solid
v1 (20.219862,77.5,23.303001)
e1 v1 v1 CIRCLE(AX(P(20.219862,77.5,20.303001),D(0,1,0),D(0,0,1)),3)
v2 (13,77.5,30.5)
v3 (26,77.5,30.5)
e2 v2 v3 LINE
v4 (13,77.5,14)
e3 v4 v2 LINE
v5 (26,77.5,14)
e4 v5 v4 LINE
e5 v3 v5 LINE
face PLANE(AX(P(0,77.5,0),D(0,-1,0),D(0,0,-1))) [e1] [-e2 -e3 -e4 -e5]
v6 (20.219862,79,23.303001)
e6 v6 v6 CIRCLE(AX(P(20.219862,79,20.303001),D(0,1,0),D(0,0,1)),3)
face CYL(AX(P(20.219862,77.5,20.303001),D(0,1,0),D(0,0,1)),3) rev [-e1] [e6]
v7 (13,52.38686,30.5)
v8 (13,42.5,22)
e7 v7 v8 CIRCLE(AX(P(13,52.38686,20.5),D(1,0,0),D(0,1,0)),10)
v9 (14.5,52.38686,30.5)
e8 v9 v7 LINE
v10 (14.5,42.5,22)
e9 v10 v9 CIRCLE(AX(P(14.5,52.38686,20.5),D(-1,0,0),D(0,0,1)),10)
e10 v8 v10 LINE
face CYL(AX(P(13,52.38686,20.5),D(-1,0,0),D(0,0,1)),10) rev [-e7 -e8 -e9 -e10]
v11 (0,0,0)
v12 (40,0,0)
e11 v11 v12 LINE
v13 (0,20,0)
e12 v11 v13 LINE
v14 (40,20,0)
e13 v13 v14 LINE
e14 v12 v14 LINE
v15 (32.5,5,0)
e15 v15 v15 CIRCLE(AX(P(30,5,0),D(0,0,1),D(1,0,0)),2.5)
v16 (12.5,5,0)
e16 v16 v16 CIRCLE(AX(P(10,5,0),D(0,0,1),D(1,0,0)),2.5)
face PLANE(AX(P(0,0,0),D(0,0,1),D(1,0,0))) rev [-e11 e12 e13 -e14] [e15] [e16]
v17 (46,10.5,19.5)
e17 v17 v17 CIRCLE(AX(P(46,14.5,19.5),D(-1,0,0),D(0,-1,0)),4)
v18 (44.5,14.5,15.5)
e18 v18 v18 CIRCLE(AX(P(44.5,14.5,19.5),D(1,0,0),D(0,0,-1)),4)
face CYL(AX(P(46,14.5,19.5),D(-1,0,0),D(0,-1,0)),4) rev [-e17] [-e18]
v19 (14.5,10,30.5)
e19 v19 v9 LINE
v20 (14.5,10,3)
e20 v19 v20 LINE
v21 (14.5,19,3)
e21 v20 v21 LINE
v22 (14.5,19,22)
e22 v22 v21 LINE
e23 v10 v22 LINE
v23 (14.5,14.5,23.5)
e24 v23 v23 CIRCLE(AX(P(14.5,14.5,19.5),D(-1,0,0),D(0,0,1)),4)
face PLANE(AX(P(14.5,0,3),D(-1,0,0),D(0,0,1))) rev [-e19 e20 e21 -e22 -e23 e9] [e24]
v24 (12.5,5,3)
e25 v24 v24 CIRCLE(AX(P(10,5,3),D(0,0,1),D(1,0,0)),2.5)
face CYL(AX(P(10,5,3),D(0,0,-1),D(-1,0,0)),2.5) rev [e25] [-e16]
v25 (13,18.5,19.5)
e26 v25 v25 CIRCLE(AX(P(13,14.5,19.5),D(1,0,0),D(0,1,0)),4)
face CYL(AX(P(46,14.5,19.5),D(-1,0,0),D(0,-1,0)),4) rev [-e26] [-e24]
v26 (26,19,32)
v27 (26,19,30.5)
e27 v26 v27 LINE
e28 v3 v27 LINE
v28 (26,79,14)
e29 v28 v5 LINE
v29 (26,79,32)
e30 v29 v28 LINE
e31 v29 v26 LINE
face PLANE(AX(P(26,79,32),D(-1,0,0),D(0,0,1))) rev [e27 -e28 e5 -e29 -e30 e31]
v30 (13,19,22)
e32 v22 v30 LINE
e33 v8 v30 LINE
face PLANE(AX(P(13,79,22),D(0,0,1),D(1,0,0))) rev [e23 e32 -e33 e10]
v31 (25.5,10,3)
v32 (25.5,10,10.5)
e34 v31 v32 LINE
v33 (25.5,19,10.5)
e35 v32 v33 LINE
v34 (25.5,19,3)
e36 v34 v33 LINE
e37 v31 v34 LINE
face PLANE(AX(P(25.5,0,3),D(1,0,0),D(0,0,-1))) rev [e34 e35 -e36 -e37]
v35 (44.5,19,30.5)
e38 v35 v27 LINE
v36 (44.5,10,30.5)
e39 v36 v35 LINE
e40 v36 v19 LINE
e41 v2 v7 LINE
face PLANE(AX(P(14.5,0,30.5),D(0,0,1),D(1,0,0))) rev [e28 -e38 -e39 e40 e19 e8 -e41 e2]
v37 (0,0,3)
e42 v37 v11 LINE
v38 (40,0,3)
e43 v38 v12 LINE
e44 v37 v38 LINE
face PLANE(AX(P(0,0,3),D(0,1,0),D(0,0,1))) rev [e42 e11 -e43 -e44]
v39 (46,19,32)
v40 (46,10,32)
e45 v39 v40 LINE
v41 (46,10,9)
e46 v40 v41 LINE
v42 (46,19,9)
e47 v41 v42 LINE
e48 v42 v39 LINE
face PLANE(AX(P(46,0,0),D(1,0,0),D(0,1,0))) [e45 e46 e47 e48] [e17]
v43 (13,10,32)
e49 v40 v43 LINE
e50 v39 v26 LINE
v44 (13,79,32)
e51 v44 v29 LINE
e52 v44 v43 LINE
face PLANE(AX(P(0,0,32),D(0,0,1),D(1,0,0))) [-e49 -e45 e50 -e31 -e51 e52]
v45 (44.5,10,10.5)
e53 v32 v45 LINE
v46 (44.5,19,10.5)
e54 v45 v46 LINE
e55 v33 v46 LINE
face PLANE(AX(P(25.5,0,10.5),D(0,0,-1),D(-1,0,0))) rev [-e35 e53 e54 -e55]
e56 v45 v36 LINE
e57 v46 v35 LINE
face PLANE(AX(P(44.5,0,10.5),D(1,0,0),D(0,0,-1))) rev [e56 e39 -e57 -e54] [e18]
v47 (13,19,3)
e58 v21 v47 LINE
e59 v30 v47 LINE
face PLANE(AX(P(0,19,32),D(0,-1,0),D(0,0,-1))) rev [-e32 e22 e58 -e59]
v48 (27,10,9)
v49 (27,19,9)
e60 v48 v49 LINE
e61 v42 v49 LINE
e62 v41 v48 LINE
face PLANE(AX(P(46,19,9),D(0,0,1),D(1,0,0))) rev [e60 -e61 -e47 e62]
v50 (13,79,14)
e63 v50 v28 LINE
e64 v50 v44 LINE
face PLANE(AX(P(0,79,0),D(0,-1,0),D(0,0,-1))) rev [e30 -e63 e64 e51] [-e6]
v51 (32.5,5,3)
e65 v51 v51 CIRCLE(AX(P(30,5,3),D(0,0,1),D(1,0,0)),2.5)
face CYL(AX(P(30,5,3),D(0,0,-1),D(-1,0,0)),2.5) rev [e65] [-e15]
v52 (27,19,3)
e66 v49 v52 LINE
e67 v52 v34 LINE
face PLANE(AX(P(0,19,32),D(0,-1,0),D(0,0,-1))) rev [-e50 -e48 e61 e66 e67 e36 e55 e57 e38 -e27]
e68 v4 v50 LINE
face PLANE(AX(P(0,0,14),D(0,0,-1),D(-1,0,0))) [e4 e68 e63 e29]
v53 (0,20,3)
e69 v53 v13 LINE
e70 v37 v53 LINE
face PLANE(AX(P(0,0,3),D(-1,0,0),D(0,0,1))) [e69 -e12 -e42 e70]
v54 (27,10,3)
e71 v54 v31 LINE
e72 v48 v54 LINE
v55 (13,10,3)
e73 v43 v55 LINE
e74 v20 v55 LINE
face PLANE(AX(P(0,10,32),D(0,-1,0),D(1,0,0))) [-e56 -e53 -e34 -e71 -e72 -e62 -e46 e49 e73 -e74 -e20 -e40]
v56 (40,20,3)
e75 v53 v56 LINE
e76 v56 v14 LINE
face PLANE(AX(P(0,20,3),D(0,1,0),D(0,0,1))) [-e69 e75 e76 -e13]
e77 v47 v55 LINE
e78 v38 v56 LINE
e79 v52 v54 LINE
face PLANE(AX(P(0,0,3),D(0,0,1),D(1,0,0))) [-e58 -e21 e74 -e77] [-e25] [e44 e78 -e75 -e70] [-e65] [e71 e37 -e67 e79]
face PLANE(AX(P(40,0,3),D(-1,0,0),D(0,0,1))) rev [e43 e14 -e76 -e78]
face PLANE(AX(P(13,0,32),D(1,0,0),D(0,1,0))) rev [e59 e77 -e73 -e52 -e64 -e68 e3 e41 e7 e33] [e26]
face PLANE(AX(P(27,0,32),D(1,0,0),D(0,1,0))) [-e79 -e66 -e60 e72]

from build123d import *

# Parameters (mm, degrees)
SKETCH1_W               = 7
SKETCH1_H               = 9
BOSS_EXTRUDE2_DEPTH     = 32
SKETCH1_4_R             = 2.5
BOSS_EXTRUDE3_DEPTH     = 3
CUT_EXTRUDE1_DEPTH      = 55.635153519
CUT_EXTRUDE1_DEPTH_BACK = 55.635153519
SKETCH3_W               = 11
SKETCH3_H               = 27.5
SKETCH6_W               = 23
SKETCH6_H               = 9
BOSS_EXTRUDE4_DEPTH     = 19
CUT_EXTRUDE3_DEPTH      = 60.16924877
CUT_EXTRUDE3_DEPTH_BACK = 60.16924877
SKETCH9_W               = 19
SKETCH9_H               = 20
CUT_EXTRUDE4_DEPTH      = 51.129831438
CUT_EXTRUDE4_DEPTH_BACK = 51.129831438
SKETCH12_R              = 4
SKETCH14_W              = 13
SKETCH14_H              = 10
BOSS_EXTRUDE6_DEPTH     = 60
SKETCH17_W              = 11.5
SKETCH17_H              = 8.5
CUT_EXTRUDE6_DEPTH      = 58.5
SKETCH18_W              = 13
SKETCH18_H              = 1.5
BOSS_EXTRUDE7_DEPTH     = 8
SKETCH19_R              = 3
CUT_EXTRUDE7_DEPTH      = 1.5
SKETCH20_W              = 8.5
SKETCH20_H              = 35
CUT_EXTRUDE8_DEPTH      = 1.5
FILLET1_R               = 10


with BuildPart() as part:
    # Sketch1 → Boss-Extrude2 (new body)
    with BuildSketch(Plane.XY):
        with Locations((23.5, 14.5)):
            Rectangle(SKETCH1_W, SKETCH1_H)
        with Locations((16.5, 14.5)):
            Rectangle(SKETCH1_W, SKETCH1_H)
    extrude(amount=BOSS_EXTRUDE2_DEPTH)

    # Sketch1<4> → Boss-Extrude3 (add)
    # profile 1 of 2: a face of its own
    with BuildSketch(Plane.XY):
        Polygon((0, 0), (20, 0), (20, 10), (13, 10), (13, 19), (20, 19), (20, 20), (0, 20), align=None)
        with Locations((10, 5)):
            Circle(SKETCH1_4_R, mode=Mode.SUBTRACT)
    # profile 2 of 2: a face of its own
    with BuildSketch(Plane.XY):
        Polygon((20, 10), (20, 0), (40, 0), (40, 20), (20, 20), (20, 19), (27, 19), (27, 10), align=None)
        with Locations((30, 5)):
            Circle(SKETCH1_4_R, mode=Mode.SUBTRACT)
    extrude(amount=BOSS_EXTRUDE3_DEPTH)

    # Sketch3 → Cut-Extrude1 (cut, two sides: drawn at the far end of the back side and taken through both)
    with BuildSketch(Plane(origin=(0, 19, 0), x_dir=(1, 0, 0), z_dir=(0, 1, 0)).offset(-CUT_EXTRUDE1_DEPTH_BACK)):
        with Locations((20, -16.75)):
            Rectangle(SKETCH3_W, SKETCH3_H)
    extrude(amount=CUT_EXTRUDE1_DEPTH + CUT_EXTRUDE1_DEPTH_BACK, mode=Mode.SUBTRACT)

    # Sketch6 → Boss-Extrude4 (add)
    with BuildSketch(Plane(origin=(27, 0, 0), x_dir=(0, 0, -1), z_dir=(1, 0, 0))):
        with Locations((-20.5, 14.5)):
            Rectangle(SKETCH6_W, SKETCH6_H)
    extrude(amount=BOSS_EXTRUDE4_DEPTH)

    # Sketch9 → Cut-Extrude3 (cut, two sides: drawn at the far end of the back side and taken through both)
    with BuildSketch(Plane(origin=(0, 19, 0), x_dir=(1, 0, 0), z_dir=(0, 1, 0)).offset(-CUT_EXTRUDE3_DEPTH_BACK)):
        with Locations((35, -20.5)):
            Rectangle(SKETCH9_W, SKETCH9_H)
    extrude(amount=CUT_EXTRUDE3_DEPTH + CUT_EXTRUDE3_DEPTH_BACK, mode=Mode.SUBTRACT)

    # Sketch12 → Cut-Extrude4 (cut, two sides: drawn at the far end of the back side and taken through both)
    with BuildSketch(Plane.ZY.offset(-13).offset(-CUT_EXTRUDE4_DEPTH_BACK)):
        with Locations(Location((19.5, 14.5, 0), (0, 0, 270))):
            Circle(SKETCH12_R)
    extrude(amount=CUT_EXTRUDE4_DEPTH + CUT_EXTRUDE4_DEPTH_BACK, mode=Mode.SUBTRACT)

    # Sketch14 → Boss-Extrude6 (add)
    with BuildSketch(Plane(origin=(0, 19, 0), x_dir=(1, 0, 0), z_dir=(0, 1, 0))):
        with Locations((19.5, -27)):
            Rectangle(SKETCH14_W, SKETCH14_H)
    extrude(amount=BOSS_EXTRUDE6_DEPTH)

    # Sketch17 → Cut-Extrude6 (cut)
    with BuildSketch(Plane.XZ.offset(-19)):
        with Locations((20.25, 26.25)):
            Rectangle(SKETCH17_W, SKETCH17_H)
    extrude(amount=-CUT_EXTRUDE6_DEPTH, mode=Mode.SUBTRACT)

    # Sketch18 → Boss-Extrude7 (add)
    with BuildSketch(Plane(origin=(0, 0, 22), x_dir=(-1, 0, 0), z_dir=(0, 0, -1))):
        with Locations((-19.5, 78.25)):
            Rectangle(SKETCH18_W, SKETCH18_H)
    extrude(amount=BOSS_EXTRUDE7_DEPTH)

    # Sketch19 → Cut-Extrude7 (cut)
    with BuildSketch(Plane(origin=(0, 79, 0), x_dir=(1, 0, 0), z_dir=(0, 1, 0))):
        with Locations(Location((20.2198624, -20.303001359, 0), (0, 0, 270))):
            Circle(SKETCH19_R)
    extrude(amount=-CUT_EXTRUDE7_DEPTH, mode=Mode.SUBTRACT)

    # Sketch20 → Cut-Extrude8 (cut)
    with BuildSketch(Plane(origin=(14.5, 0, 0), x_dir=(0, 0, -1), z_dir=(1, 0, 0))):
        with Locations((-26.25, 60)):
            Rectangle(SKETCH20_W, SKETCH20_H)
    extrude(amount=-CUT_EXTRUDE8_DEPTH, mode=Mode.SUBTRACT)

    # Fillet1
    # the kernel refuses this fillet: 10 mm, written as the material it adds along each edge
    with BuildSketch(Plane(origin=(14.5, 42.5, 30.5), x_dir=(0, 0, -1), z_dir=(-1, 0, 0))) as fillet1_piece_1:
        with BuildLine():
            CenterArc((10, -9.886859967), FILLET1_R, 98.626926559, 81.373073441)
            Line((0, -9.886859967), (-0.2, -9.886859967))
            Line((-0.2, -9.886859967), (-0.2, 0))
            Line((-0.2, 0), (0, 0.2))
            ThreePointArc((0, 0.2), (4.25, 0.2), (8.47, 0.197737199))
            Line((8.47, 0.197737199), (8.5, 0))
        make_face()
    extrude(amount=1.5)


solid = part.part
